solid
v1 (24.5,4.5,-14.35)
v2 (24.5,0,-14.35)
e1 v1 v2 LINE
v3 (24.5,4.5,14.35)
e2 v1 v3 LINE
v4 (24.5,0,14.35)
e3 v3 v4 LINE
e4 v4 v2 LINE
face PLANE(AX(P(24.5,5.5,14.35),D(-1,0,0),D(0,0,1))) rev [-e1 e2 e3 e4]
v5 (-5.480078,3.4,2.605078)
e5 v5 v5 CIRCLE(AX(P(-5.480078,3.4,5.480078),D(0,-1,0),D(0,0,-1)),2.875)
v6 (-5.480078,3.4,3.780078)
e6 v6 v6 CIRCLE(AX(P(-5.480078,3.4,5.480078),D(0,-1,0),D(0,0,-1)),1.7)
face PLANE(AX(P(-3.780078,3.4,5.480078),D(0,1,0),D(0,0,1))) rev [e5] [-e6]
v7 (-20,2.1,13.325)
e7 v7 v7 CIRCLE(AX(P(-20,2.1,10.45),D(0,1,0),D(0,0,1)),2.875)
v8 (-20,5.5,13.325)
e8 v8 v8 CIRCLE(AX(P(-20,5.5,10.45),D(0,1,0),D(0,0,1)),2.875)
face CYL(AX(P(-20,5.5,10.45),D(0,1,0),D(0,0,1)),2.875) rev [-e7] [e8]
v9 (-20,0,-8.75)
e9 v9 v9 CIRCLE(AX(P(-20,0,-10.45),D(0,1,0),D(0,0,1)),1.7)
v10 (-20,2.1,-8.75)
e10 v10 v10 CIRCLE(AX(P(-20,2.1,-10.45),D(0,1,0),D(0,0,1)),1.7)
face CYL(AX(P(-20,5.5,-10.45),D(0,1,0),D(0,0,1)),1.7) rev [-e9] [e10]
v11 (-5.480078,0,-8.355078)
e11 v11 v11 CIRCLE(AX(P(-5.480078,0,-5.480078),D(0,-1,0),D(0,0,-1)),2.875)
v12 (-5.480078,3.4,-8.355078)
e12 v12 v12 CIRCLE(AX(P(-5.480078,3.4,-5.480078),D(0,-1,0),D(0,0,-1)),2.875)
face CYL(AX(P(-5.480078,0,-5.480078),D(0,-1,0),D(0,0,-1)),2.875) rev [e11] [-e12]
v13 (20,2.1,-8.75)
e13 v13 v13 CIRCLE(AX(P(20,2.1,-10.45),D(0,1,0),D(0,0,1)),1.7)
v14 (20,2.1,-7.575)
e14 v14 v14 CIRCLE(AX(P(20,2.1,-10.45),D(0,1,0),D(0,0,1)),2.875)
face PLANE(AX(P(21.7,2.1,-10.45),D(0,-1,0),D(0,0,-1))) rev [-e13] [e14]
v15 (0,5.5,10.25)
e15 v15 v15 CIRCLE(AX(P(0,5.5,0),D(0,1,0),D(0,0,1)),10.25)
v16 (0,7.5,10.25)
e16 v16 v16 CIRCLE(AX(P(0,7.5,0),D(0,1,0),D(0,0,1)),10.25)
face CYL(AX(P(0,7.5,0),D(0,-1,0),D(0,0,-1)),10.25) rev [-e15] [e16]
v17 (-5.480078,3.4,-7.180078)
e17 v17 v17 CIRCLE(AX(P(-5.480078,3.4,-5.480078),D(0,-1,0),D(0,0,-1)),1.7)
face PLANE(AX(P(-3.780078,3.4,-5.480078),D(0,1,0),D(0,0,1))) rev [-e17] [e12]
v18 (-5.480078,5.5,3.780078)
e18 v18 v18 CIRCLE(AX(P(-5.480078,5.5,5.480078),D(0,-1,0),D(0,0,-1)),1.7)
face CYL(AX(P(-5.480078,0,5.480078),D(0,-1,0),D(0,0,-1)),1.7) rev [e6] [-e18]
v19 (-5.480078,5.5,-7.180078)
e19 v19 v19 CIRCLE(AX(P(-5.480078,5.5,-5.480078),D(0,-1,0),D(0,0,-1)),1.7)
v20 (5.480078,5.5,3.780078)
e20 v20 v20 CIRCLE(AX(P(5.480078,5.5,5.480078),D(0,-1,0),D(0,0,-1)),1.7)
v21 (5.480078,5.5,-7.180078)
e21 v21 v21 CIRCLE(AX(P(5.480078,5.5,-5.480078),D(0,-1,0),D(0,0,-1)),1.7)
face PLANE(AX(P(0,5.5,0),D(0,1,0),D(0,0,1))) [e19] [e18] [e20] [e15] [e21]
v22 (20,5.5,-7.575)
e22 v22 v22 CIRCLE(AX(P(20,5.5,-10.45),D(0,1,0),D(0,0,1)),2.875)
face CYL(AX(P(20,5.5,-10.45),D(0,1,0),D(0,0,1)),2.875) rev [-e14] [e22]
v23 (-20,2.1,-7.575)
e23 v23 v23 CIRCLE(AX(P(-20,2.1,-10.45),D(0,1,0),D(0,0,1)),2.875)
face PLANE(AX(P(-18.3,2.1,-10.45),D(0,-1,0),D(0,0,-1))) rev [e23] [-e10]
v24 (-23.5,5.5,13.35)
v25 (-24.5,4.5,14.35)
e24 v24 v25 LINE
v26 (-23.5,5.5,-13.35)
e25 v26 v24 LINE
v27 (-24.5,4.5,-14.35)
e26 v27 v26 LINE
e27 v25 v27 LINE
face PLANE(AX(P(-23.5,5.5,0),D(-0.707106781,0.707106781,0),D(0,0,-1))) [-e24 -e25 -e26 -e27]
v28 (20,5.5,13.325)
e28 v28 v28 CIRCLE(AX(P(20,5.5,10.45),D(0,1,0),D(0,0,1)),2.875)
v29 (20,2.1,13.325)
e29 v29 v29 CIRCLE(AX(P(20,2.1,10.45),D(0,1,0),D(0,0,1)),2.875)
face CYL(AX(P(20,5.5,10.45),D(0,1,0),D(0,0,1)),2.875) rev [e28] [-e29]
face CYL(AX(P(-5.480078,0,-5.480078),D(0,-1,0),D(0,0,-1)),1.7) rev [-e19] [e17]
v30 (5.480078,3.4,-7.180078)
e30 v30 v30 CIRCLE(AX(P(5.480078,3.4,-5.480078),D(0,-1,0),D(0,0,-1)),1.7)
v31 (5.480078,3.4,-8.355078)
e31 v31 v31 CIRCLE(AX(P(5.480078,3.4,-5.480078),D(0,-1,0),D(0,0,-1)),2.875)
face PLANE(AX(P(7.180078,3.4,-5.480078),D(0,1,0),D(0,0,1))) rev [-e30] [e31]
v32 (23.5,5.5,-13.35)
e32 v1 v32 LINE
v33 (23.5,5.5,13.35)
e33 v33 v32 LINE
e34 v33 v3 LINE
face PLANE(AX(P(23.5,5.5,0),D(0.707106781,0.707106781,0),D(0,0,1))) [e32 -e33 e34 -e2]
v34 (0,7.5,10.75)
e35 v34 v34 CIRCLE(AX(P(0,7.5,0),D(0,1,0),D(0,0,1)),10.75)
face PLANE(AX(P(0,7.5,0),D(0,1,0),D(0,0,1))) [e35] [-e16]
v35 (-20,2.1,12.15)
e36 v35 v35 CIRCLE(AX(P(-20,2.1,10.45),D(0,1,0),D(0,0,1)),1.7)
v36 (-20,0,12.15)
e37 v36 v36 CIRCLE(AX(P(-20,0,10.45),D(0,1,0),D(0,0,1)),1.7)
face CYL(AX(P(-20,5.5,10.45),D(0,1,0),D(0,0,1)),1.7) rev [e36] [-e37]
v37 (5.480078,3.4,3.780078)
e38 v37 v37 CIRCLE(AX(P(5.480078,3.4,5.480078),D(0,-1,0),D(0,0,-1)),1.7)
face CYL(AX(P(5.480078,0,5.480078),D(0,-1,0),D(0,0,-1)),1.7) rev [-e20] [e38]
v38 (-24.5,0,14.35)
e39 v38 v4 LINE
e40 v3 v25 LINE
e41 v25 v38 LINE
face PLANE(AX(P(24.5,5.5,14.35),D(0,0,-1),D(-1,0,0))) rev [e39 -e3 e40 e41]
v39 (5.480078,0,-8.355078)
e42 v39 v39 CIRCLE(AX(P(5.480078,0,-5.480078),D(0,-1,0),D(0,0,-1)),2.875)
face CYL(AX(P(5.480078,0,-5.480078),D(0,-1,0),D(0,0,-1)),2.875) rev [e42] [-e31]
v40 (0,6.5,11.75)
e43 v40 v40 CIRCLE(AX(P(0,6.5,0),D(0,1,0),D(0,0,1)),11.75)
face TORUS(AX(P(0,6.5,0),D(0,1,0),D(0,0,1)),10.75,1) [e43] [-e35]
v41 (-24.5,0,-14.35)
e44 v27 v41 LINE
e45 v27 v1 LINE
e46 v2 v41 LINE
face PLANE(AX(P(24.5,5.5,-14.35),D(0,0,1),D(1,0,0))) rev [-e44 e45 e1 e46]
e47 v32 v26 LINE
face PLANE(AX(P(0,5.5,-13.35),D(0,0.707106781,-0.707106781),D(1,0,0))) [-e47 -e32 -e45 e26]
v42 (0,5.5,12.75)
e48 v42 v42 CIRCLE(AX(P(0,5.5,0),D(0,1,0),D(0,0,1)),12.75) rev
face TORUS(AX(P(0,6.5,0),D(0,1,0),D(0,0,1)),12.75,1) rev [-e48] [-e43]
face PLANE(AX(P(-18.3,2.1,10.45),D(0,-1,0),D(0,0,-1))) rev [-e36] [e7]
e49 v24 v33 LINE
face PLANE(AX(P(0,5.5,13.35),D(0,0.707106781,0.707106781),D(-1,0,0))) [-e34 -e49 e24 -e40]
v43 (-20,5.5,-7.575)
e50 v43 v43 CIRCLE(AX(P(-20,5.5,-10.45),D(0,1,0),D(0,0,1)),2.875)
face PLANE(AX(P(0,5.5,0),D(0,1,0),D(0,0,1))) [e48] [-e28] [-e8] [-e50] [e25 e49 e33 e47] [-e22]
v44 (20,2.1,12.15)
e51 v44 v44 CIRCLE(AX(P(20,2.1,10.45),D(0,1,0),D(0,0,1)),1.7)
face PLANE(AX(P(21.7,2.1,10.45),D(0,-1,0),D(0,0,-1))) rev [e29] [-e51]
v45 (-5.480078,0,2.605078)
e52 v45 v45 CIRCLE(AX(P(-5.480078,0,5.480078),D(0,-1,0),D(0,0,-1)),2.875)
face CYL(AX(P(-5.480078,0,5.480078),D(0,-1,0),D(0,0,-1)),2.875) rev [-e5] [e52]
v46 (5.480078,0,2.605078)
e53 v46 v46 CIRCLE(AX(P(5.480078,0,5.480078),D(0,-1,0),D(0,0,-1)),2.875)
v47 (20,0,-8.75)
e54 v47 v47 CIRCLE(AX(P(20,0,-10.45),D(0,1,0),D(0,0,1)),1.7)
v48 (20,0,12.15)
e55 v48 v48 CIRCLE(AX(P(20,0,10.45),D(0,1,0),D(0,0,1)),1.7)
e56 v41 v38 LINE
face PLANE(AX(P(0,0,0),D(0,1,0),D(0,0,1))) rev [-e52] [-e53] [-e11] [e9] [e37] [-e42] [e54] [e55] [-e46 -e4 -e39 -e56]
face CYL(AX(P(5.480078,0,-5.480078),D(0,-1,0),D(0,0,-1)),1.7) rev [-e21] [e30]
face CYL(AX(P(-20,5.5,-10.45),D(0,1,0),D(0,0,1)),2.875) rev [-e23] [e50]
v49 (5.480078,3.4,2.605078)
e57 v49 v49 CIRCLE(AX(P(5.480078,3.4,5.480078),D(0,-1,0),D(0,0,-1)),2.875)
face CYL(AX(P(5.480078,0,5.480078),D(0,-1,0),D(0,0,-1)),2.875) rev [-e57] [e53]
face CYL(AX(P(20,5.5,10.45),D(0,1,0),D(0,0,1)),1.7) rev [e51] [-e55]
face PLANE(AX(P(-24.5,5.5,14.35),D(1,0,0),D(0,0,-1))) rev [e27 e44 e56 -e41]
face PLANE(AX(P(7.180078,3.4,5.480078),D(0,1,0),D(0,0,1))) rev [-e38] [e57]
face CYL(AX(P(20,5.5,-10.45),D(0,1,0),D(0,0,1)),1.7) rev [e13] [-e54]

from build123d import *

# Parameters (mm, degrees)
SKETCH1_W                      = 49
SKETCH1_H                      = 28.7
BOSS_EXTRUDE1_DEPTH            = 5.5
CBORE_FOR_M3_SHCS1_D           = 3.4
CBORE_FOR_M3_SHCS1_CBORE_D     = 5.75
CBORE_FOR_M3_SHCS1_CBORE_DEPTH = 3.4
CBORE_FOR_M3_SHCS2_D           = 3.4
CBORE_FOR_M3_SHCS2_CBORE_D     = 5.75
CBORE_FOR_M3_SHCS2_CBORE_DEPTH = 3.4
SKETCH9_R                      = 11.75
SKETCH9_R_2                    = 10.25
BOSS_EXTRUDE2_DEPTH            = 2
FILLET1_R                      = 1
CHAMFER1_SIZE                  = 1


with BuildPart() as part:
    # Sketch1 → Boss-Extrude1 (new body)
    with BuildSketch(Plane(origin=(0, 0, 0), x_dir=(1, 0, 0), z_dir=(0, 1, 0))):
        Rectangle(SKETCH1_W, SKETCH1_H)
    extrude(amount=BOSS_EXTRUDE1_DEPTH)

    # CBORE for M3 SHCS1 (through all)
    with Locations(Plane(origin=(0, 5.5, 0), x_dir=(1, 0, 0), z_dir=(0, 1, 0))):
        with Locations((-20, 10.45), (20, 10.45), (20, -10.45), (-20, -10.45)):
            CounterBoreHole(CBORE_FOR_M3_SHCS1_D / 2, CBORE_FOR_M3_SHCS1_CBORE_D / 2, CBORE_FOR_M3_SHCS1_CBORE_DEPTH)

    # CBORE for M3 SHCS2 (through all)
    with Locations(Plane(origin=(0, 0, 0), x_dir=(-1, 0, 0), z_dir=(0, -1, 0))):
        with Locations((-5.480077554, -5.480077554), (5.480077554, -5.480077554), (5.480077554, 5.480077554), (-5.480077554, 5.480077554)):
            CounterBoreHole(CBORE_FOR_M3_SHCS2_D / 2, CBORE_FOR_M3_SHCS2_CBORE_D / 2, CBORE_FOR_M3_SHCS2_CBORE_DEPTH)

    # Sketch9 → Boss-Extrude2 (add)
    with BuildSketch(Plane(origin=(0, 5.5, 0), x_dir=(1, 0, 0), z_dir=(0, 1, 0))):
        with Locations(Location((0, 0, 0), (0, 0, 270))):
            Circle(SKETCH9_R)
        with Locations(Location((0, 0, 0), (0, 0, 270))):
            Circle(SKETCH9_R_2, mode=Mode.SUBTRACT)
    extrude(amount=BOSS_EXTRUDE2_DEPTH)

    # Fillet1
    fillet1_edges = [part.edges().sort_by_distance(p)[0] for p in [
        (0, 5.5, -11.75),
        (0, 7.5, -11.75),
    ]]
    fillet(fillet1_edges, radius=FILLET1_R - 0.0001)  # a hair under: the kernel refuses the full size

    # Chamfer1
    chamfer1_edges = [part.edges().sort_by_distance(p)[0] for p in [
        (24.5, 5.5, 0),
        (0, 5.5, -14.35),
        (-24.5, 5.5, 0),
        (0, 5.5, 14.35),
    ]]
    chamfer(chamfer1_edges, length=CHAMFER1_SIZE)


solid = part.part
